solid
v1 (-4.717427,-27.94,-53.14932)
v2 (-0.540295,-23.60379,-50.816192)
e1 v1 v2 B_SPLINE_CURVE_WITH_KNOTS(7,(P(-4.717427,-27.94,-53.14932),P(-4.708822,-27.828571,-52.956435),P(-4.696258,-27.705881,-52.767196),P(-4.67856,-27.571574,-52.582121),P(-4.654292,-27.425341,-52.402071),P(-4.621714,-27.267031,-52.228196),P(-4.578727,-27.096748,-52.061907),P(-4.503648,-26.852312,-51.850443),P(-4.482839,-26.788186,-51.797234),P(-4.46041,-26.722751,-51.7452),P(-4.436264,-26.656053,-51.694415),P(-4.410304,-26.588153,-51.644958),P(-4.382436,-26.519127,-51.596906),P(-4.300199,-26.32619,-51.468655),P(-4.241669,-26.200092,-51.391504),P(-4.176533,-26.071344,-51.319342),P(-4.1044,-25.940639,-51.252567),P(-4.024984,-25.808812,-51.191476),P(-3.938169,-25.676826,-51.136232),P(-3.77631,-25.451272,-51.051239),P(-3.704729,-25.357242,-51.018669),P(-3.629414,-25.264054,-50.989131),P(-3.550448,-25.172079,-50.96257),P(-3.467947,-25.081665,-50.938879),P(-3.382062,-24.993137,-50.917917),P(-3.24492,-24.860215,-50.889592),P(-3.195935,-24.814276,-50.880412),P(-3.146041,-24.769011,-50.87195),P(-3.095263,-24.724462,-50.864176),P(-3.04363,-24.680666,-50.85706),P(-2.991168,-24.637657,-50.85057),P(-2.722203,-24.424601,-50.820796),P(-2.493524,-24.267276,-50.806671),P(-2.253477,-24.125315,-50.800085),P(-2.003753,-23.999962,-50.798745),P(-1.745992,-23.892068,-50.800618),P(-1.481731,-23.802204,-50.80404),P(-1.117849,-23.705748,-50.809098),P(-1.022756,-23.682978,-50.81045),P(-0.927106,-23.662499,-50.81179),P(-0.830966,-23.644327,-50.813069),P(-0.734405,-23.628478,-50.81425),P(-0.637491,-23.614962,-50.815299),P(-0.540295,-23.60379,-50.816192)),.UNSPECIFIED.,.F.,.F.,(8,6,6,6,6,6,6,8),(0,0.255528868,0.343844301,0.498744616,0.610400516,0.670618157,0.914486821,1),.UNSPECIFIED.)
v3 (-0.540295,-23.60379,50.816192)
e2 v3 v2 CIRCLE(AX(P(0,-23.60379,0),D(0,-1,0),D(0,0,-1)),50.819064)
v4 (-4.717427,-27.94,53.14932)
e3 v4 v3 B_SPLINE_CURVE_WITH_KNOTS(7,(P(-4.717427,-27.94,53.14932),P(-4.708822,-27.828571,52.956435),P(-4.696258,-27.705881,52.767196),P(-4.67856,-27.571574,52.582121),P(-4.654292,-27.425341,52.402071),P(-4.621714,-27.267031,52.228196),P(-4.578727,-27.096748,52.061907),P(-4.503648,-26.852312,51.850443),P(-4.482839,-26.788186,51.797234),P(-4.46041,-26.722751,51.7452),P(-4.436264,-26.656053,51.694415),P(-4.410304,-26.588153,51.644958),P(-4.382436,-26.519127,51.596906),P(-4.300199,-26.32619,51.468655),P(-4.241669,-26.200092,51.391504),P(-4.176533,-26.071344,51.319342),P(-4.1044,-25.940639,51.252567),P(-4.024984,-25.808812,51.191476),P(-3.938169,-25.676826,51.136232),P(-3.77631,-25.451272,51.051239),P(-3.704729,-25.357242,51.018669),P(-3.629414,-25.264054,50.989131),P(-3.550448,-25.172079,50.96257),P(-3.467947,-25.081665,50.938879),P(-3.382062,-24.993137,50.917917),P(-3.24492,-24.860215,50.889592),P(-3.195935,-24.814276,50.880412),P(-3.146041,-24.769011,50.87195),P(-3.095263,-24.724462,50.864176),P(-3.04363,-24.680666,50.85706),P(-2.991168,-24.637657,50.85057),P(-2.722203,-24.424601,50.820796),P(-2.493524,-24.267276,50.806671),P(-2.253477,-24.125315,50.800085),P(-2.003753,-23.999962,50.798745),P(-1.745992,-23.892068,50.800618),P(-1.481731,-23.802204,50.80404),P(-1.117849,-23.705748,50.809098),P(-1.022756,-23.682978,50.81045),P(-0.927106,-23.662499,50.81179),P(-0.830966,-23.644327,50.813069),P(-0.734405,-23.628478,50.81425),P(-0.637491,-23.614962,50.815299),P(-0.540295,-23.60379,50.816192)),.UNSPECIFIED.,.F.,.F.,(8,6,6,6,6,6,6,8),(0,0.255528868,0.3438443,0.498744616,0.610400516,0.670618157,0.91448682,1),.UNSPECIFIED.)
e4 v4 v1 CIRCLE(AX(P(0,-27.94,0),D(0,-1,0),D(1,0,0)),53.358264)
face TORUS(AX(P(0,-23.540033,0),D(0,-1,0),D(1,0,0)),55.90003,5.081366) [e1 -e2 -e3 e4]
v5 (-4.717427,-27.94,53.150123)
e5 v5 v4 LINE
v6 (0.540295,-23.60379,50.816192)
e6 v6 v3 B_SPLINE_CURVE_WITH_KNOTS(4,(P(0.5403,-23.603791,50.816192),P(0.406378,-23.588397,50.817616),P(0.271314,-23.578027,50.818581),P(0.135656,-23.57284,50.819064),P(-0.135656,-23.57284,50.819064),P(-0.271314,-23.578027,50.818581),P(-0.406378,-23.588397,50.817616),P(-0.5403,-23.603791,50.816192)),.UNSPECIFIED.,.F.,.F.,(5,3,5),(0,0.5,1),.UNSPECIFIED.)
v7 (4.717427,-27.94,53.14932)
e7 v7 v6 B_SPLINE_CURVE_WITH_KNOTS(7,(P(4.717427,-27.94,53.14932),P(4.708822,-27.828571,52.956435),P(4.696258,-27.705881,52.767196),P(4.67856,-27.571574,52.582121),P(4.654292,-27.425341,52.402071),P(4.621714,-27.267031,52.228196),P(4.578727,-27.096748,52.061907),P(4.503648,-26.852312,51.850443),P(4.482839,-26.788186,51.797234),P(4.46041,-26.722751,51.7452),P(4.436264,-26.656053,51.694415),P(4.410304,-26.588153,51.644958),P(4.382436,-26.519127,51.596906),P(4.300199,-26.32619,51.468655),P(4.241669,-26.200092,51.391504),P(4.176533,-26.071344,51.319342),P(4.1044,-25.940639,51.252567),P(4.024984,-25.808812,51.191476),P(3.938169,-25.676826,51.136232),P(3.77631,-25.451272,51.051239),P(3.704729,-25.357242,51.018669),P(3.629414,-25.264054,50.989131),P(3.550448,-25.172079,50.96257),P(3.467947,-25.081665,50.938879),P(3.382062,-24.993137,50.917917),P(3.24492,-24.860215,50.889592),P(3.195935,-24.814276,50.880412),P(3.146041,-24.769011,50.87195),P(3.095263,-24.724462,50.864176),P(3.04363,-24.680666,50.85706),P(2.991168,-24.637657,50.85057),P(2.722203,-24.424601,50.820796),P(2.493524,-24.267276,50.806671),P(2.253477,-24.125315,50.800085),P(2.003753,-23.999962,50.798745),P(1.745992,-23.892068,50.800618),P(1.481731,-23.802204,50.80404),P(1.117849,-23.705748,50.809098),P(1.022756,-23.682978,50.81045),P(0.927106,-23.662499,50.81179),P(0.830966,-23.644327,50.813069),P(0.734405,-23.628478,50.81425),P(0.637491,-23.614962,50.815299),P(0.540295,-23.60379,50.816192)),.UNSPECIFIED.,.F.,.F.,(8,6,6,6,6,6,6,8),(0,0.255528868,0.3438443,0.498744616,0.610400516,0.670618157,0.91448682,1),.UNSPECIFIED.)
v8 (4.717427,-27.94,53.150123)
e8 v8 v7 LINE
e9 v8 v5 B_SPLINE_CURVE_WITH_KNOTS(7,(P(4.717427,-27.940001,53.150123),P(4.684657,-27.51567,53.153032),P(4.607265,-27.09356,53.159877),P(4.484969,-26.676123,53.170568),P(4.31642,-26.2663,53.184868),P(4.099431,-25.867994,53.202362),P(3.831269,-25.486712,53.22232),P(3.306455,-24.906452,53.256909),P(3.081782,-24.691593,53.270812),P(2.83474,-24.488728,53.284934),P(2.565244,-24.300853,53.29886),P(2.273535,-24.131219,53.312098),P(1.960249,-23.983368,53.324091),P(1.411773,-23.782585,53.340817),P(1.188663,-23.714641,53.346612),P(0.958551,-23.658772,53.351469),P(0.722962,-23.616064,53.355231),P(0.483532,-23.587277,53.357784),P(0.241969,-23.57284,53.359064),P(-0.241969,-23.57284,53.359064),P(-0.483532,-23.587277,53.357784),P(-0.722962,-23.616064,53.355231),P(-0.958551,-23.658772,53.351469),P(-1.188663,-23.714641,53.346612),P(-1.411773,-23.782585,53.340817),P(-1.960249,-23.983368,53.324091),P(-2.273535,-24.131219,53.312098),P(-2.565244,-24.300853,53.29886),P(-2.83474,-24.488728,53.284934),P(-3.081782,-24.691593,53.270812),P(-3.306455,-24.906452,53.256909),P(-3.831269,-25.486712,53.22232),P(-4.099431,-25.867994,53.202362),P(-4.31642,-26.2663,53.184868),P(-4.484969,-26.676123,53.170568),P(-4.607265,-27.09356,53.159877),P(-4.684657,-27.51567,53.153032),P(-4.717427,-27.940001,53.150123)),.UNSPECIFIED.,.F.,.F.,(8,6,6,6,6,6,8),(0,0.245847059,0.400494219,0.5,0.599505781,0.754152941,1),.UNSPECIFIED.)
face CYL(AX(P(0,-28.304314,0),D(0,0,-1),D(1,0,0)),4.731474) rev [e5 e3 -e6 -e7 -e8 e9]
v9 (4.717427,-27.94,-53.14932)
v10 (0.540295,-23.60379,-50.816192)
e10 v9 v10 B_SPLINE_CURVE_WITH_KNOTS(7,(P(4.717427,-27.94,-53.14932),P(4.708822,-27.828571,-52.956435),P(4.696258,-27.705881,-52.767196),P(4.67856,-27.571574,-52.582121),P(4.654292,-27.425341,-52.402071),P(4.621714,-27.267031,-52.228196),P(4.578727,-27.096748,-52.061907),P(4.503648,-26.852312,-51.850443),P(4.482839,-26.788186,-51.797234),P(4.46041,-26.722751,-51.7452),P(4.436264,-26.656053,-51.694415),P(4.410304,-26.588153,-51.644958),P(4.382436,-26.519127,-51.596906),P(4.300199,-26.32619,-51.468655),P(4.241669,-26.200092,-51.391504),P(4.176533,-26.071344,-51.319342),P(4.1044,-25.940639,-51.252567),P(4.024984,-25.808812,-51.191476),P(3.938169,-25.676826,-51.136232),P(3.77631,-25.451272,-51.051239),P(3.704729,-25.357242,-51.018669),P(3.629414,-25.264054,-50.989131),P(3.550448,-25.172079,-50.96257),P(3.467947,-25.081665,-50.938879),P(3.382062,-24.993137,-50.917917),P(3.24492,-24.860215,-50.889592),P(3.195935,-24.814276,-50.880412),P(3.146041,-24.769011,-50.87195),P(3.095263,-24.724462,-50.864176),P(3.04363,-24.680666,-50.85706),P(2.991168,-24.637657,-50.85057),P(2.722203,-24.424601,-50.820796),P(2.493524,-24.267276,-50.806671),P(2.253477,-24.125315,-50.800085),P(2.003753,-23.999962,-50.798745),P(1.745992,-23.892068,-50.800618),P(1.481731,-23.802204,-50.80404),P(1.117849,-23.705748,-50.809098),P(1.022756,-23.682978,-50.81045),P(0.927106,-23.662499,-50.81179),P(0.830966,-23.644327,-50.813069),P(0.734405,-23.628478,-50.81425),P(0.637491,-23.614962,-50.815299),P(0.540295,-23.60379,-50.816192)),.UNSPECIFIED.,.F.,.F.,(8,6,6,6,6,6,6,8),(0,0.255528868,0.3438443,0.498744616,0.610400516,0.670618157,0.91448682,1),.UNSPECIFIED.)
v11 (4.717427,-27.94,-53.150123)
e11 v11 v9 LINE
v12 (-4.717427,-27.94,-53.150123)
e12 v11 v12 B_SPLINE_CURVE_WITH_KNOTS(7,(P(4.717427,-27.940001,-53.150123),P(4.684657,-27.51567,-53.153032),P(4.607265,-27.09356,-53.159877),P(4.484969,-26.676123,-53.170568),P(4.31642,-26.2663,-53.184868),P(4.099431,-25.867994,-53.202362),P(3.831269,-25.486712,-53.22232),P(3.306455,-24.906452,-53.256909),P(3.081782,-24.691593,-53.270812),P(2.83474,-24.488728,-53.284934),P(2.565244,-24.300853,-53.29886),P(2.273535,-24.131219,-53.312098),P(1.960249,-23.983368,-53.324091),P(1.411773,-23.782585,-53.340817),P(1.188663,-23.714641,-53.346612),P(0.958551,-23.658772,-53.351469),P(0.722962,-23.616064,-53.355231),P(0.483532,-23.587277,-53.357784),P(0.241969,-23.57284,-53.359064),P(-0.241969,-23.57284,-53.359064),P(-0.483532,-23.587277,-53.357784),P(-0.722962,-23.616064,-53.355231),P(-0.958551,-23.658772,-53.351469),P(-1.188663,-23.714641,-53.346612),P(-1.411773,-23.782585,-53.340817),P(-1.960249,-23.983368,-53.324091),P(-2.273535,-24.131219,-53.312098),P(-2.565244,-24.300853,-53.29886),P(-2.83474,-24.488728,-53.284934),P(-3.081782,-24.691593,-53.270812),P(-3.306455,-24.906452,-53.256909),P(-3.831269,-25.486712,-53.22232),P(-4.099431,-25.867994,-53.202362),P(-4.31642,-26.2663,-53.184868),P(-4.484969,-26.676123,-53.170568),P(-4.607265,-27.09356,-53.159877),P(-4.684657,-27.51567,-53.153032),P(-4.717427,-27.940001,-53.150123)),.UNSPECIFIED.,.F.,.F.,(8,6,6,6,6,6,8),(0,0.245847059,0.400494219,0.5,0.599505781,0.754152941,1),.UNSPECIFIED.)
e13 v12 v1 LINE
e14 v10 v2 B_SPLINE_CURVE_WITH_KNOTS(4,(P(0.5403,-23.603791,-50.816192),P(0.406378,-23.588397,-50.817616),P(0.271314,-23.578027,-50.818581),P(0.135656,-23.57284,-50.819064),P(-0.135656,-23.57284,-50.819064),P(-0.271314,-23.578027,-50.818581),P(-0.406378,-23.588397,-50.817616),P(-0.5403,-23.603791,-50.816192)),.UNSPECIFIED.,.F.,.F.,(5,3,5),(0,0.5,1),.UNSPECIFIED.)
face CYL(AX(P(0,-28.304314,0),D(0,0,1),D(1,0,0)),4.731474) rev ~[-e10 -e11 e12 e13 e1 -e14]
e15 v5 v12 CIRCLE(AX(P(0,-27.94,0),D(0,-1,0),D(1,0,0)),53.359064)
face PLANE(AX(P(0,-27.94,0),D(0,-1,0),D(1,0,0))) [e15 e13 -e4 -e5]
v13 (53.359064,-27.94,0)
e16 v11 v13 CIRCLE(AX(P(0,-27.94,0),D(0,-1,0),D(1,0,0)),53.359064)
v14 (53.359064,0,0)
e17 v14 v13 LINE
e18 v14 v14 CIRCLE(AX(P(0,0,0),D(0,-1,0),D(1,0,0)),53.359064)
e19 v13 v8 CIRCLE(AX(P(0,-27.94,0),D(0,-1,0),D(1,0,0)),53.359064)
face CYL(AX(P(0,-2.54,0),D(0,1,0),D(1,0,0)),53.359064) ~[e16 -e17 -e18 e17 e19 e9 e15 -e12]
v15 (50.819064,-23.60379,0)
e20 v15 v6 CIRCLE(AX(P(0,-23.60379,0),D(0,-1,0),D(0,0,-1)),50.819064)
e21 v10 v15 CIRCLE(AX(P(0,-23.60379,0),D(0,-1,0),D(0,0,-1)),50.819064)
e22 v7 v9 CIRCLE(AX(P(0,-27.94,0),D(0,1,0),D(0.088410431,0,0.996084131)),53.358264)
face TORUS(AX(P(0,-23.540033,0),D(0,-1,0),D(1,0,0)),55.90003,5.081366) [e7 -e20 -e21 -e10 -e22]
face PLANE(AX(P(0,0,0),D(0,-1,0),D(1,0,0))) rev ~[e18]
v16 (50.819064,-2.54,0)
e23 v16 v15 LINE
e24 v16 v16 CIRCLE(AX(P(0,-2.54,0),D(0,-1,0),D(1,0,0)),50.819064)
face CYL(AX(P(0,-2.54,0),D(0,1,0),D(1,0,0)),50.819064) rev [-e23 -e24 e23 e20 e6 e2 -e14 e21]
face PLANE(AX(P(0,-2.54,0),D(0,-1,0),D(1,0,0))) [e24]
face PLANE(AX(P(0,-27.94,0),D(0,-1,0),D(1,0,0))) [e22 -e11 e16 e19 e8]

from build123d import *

# Parameters (mm, degrees)
F0_R          = 53.3590641314
F1_DEPTH      = 2.54
F2_R          = 53.3590641314
F2_R_2        = 50.8190641314
F3_DEPTH      = 25.4
F5_R          = 4.731473746
F6_DEPTH      = 53.3600641314
F6_DEPTH_BACK = 53.3600641314


# Not quite as in the source:
# - a fillet or chamfer that OpenCascade refuses, or shapes differently, is made with other operations: its cross-section is extruded or revolved along the edge and cut away or added


with BuildPart() as f1:
    # F0 (on Front) → F1 (new body)
    with BuildSketch(Plane.XZ):
        Circle(F0_R)
    extrude(amount=F1_DEPTH)

    # F2 (on face) → F3 (join)
    with BuildSketch(Plane.XZ.offset(2.54)):
        Circle(F2_R)
        Circle(F2_R_2, mode=Mode.SUBTRACT)
    extrude(amount=F3_DEPTH)

    # F4: fillet of radius 5.08 on 1 edges, made by hand

    # F4_s1 → F4_t2 (revolve, cut)
    with BuildSketch(Plane.XY):
        with BuildLine():
            ThreePointArc((53.3588640934, -27.9403463882), (51.4992986538, -26.0804748362), (50.8186641314, -23.5400334454))
            Line((50.8186641314, -23.5400334454), (50.3105275628, -23.5400334454))
            ThreePointArc((50.3105275628, -23.5400334454), (50.3109275628, -25.7400167227), (50.3109275628, -27.94))
            Line((50.3109275628, -27.94), (50.8190641314, -28.4481365685))
            ThreePointArc((50.8190641314, -28.4481365685), (52.0889641124, -28.4481365685), (53.104747521, -28.3803776825))
            Line((53.104747521, -28.3803776825), (53.3588640934, -27.9403463882))
        make_face()
    revolve(axis=Axis((0, -27.94, 0), (0, -1, 0)), mode=Mode.SUBTRACT)

    # F5 (on Top) → F6 (cut, two sides)
    with BuildSketch(Plane.XY) as f6_sk:
        with Locations((0, -28.3043142408)):
            Circle(F5_R)
    extrude(amount=-F6_DEPTH, mode=Mode.SUBTRACT)
    extrude(f6_sk.sketch, amount=F6_DEPTH_BACK, mode=Mode.SUBTRACT)


solid = f1.part
